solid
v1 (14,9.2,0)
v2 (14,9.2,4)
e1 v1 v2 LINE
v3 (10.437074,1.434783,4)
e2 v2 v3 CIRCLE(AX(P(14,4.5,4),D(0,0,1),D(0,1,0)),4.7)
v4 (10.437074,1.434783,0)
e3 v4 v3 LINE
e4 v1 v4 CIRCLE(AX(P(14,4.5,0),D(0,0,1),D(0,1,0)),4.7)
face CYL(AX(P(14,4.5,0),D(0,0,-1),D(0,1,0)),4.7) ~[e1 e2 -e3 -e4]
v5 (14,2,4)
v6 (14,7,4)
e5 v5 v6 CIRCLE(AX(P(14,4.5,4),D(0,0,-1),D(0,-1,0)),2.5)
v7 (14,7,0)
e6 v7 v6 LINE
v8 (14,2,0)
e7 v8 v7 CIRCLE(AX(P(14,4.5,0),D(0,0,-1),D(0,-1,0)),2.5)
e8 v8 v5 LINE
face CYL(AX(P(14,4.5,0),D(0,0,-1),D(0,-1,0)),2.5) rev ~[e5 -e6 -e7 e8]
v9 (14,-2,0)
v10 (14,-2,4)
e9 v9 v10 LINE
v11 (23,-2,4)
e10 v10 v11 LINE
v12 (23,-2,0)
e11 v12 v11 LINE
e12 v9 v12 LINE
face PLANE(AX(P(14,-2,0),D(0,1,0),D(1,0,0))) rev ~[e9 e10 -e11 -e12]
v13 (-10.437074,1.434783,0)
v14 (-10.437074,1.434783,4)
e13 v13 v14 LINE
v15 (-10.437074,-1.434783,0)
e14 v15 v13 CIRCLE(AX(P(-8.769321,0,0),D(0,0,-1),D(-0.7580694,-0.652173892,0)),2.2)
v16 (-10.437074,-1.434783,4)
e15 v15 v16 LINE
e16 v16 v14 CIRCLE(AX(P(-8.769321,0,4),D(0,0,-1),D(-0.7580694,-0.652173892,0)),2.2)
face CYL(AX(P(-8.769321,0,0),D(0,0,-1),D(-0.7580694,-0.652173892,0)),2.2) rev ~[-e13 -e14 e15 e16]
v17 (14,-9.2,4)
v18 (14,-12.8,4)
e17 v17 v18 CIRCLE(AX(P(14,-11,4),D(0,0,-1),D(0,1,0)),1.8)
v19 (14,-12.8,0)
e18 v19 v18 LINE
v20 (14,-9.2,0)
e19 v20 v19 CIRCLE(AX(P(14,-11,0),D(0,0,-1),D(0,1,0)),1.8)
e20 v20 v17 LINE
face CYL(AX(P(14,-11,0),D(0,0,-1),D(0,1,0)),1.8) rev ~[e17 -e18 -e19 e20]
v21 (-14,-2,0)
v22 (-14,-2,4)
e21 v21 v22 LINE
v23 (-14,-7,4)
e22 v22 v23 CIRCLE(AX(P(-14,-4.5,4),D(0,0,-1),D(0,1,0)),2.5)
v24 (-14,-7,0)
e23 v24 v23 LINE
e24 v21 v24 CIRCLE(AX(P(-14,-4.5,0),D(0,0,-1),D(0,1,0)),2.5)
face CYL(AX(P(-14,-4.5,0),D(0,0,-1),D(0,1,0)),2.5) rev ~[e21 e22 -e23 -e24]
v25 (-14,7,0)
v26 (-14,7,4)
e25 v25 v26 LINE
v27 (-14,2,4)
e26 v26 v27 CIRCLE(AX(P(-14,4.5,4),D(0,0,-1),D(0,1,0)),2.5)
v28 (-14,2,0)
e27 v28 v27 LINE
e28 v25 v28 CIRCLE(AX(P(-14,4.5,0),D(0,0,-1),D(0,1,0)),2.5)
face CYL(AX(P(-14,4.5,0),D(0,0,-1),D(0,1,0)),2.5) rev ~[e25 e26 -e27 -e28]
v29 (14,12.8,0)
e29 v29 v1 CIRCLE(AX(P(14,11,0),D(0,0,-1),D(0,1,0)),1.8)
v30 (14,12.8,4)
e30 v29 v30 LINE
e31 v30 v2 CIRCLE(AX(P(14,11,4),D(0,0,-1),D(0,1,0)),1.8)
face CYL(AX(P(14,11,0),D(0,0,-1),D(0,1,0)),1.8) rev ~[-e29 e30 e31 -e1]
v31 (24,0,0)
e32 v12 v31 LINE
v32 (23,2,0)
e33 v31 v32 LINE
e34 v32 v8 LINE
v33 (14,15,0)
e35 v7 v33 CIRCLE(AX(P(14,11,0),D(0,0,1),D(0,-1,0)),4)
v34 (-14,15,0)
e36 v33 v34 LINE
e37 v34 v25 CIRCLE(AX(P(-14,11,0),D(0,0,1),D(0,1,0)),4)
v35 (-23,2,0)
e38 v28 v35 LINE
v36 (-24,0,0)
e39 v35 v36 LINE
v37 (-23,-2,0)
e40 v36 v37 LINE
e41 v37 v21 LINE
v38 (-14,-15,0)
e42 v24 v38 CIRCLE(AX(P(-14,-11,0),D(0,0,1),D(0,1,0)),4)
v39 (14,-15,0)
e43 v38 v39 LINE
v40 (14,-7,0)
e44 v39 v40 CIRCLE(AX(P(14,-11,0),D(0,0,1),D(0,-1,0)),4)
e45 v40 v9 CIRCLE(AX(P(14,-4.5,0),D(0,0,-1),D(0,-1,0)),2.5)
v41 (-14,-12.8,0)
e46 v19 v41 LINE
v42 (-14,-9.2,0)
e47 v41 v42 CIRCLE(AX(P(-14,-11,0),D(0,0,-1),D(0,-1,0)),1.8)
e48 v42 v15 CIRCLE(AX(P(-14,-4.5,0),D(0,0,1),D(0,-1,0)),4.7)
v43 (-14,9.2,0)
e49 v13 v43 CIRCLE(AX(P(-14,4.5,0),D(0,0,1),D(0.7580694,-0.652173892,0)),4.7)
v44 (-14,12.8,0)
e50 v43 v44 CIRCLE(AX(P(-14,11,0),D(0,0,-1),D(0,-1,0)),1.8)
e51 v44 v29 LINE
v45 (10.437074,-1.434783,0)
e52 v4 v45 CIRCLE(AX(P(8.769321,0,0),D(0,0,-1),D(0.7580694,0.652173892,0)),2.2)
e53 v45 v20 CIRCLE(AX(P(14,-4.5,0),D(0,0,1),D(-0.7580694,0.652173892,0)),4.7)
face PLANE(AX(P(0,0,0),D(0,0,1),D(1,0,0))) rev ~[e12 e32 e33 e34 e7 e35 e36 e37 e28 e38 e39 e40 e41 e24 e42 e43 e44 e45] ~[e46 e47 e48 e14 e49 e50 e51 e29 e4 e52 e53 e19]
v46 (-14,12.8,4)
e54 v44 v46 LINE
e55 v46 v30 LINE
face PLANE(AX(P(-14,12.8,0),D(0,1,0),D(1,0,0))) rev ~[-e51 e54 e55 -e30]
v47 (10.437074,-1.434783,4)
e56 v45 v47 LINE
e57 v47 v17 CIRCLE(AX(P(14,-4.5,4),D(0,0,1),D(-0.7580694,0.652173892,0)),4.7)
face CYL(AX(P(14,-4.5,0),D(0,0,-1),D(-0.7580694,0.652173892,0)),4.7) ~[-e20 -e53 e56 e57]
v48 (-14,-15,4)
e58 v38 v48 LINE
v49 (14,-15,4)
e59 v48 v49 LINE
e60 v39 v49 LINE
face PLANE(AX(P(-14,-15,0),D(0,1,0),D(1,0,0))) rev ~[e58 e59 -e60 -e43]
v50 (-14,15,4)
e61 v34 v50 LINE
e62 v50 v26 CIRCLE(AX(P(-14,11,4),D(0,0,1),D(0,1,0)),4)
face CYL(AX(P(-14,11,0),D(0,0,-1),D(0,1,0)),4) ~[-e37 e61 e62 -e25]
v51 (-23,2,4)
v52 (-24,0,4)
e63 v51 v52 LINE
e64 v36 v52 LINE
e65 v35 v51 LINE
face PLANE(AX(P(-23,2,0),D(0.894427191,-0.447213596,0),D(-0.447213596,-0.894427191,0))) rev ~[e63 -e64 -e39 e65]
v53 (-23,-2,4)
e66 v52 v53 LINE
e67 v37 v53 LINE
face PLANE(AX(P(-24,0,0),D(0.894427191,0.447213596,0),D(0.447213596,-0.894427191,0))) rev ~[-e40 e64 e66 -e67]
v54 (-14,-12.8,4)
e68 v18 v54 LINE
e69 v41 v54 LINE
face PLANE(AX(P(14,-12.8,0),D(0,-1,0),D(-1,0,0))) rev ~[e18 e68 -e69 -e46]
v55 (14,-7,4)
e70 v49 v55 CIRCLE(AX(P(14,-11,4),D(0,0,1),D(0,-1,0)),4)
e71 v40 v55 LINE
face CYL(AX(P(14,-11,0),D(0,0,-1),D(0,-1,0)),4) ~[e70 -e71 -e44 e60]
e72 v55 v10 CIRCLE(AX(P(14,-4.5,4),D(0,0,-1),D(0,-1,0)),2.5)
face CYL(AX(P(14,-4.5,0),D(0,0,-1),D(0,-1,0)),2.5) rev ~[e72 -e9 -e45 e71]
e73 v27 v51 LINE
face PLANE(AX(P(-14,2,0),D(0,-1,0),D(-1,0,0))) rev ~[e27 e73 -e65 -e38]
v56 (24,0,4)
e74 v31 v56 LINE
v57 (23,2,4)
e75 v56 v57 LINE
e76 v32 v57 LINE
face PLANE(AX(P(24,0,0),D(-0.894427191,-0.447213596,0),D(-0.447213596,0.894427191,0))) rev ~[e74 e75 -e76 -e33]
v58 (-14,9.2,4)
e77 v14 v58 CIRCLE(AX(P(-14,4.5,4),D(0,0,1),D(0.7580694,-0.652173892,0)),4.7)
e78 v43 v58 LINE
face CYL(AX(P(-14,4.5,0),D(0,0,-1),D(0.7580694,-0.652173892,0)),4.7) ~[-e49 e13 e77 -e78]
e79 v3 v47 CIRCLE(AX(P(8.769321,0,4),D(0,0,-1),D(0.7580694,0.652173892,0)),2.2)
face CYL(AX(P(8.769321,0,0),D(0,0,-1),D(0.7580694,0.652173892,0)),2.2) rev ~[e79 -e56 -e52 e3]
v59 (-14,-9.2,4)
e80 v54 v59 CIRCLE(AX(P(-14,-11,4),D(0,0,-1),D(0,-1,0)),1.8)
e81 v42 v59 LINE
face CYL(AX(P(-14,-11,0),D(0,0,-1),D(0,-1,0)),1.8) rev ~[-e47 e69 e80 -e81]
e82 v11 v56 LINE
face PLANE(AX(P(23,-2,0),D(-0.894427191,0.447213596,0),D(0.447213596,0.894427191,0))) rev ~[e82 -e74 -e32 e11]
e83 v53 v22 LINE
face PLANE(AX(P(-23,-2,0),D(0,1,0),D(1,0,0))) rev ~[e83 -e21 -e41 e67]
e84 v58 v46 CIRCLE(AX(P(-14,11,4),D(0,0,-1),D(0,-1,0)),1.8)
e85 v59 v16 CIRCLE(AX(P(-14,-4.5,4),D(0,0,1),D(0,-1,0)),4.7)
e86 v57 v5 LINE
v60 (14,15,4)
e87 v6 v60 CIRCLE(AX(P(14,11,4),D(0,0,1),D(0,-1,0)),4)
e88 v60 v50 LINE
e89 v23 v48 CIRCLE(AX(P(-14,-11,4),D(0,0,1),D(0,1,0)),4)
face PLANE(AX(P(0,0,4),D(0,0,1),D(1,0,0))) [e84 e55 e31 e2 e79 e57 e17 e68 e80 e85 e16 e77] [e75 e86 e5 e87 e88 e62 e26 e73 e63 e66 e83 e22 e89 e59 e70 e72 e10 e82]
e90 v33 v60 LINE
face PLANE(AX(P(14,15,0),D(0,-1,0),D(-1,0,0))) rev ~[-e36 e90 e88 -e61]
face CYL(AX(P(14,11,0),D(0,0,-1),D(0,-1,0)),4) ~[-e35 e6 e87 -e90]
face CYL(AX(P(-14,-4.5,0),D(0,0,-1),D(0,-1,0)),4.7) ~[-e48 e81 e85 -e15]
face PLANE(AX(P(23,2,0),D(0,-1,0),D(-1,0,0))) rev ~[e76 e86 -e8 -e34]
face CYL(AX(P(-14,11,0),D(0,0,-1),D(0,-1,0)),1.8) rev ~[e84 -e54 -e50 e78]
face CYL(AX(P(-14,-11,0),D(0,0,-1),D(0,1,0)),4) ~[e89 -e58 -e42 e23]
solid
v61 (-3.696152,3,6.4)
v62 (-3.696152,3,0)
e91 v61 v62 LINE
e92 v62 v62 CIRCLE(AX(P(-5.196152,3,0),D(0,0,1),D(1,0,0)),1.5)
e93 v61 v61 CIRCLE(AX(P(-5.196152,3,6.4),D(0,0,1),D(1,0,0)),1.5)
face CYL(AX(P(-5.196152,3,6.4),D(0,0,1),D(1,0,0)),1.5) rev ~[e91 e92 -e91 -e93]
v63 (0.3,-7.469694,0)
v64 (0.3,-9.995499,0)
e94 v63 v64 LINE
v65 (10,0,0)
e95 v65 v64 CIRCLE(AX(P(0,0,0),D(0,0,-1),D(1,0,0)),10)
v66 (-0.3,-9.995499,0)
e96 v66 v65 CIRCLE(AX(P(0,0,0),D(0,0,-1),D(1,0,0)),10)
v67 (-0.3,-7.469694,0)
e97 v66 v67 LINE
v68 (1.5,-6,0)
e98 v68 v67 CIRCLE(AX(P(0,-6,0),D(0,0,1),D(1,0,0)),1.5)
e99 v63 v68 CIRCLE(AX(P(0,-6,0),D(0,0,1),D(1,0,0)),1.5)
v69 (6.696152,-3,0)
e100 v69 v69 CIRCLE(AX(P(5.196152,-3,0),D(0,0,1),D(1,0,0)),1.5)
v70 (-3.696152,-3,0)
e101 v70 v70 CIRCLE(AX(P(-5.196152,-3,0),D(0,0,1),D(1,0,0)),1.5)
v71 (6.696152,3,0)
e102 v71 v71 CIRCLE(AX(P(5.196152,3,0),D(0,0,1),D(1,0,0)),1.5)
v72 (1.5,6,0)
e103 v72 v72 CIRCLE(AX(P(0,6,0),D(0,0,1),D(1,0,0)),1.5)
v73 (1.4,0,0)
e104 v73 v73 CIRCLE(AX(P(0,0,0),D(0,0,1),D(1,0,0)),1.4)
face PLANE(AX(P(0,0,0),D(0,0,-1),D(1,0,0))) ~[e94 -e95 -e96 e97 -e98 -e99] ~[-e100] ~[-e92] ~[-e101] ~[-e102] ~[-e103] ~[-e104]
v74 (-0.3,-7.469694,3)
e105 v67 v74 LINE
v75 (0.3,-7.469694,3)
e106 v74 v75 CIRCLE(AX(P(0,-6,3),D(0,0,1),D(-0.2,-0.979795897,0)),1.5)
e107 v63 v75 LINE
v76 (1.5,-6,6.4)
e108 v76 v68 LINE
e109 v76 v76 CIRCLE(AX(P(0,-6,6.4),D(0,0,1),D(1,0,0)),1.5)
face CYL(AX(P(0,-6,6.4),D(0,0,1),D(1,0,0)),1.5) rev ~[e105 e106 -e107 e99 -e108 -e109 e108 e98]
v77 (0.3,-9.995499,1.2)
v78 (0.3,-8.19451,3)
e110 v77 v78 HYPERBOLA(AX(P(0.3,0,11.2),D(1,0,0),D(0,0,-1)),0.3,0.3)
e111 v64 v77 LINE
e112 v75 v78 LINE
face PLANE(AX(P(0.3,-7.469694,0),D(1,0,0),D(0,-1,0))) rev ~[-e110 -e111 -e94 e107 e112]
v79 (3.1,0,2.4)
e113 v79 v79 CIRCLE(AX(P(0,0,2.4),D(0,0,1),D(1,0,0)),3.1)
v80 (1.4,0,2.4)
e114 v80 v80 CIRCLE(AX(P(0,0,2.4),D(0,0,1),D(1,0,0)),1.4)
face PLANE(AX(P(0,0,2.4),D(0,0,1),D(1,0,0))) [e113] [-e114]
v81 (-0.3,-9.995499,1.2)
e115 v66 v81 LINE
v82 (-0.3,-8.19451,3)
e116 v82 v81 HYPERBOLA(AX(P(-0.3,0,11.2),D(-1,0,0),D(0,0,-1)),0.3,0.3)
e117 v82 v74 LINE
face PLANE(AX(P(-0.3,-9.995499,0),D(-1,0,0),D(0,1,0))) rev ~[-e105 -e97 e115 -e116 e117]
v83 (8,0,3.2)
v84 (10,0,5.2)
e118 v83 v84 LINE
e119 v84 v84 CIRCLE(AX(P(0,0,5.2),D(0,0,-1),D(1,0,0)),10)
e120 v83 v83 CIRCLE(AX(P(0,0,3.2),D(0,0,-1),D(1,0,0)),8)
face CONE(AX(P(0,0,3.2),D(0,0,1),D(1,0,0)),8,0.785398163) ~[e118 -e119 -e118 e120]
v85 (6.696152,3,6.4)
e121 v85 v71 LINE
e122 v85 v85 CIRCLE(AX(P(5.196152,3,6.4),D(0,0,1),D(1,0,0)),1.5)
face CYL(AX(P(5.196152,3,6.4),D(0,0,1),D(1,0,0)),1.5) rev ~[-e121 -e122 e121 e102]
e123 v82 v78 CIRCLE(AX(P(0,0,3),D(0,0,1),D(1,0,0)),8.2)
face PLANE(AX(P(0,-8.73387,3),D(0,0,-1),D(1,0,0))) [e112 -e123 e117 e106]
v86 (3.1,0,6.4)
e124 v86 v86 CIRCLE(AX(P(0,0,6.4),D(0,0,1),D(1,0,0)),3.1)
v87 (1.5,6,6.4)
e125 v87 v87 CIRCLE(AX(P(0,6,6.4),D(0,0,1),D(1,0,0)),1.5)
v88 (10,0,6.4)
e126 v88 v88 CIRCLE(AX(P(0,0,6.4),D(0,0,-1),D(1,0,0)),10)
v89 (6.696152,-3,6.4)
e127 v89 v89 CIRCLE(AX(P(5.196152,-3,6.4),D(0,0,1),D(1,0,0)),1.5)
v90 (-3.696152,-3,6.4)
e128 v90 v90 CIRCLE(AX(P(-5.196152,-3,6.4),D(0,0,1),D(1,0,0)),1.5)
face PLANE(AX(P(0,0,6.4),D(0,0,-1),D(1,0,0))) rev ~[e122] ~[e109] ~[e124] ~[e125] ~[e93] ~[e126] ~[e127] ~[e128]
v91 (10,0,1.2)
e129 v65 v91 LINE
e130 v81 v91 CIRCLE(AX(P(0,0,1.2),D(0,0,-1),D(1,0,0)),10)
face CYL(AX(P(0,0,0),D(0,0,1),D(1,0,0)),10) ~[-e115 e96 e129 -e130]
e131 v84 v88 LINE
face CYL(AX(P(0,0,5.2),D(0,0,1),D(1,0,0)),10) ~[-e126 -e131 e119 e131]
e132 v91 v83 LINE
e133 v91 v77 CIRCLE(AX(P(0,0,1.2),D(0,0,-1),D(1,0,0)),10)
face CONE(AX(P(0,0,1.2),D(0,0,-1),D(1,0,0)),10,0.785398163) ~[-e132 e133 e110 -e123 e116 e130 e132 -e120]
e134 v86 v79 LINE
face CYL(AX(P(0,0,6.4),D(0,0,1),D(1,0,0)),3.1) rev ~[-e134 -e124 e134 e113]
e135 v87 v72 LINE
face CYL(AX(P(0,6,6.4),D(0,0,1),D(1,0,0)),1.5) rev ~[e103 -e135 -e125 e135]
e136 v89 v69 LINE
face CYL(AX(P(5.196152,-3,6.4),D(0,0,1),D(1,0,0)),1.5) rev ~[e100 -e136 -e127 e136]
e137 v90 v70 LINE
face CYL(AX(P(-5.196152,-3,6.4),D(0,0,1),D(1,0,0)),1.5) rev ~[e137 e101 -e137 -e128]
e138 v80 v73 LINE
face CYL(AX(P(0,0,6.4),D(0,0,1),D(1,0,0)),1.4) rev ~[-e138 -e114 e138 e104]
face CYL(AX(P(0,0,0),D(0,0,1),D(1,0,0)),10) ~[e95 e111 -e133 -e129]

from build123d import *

# Parameters (mm, degrees)
F1_DEPTH = 4
F4_R     = 1.5
F4_R_2   = 1.4
F5_DEPTH = 6.401
F4_R_3   = 3.1
F6_DEPTH = 4
F8_DEPTH = 3


# Not quite as in the source:
# - a feature names something its author has since deleted; it is built from what else it names


with BuildPart() as f1:
    # F0 (on Top) → F1 (new body)
    with BuildSketch(Plane.XY):
        with BuildLine():
            Line((-23, 2), (-24, 0))
            Line((-24, 0), (-23, -2))
            Line((-23, -2), (-14, -2))
            ThreePointArc((-14, -2), (-11.5, -4.5), (-14, -7))
            ThreePointArc((-14, -7), (-18, -11), (-14, -15))
            Line((-14, -15), (0, -15))
            Line((0, -15), (14, -15))
            ThreePointArc((14, -15), (18, -11), (14, -7))
            ThreePointArc((14, -7), (11.5, -4.5), (14, -2))
            Line((14, -2), (23, -2))
            Line((23, -2), (24, 0))
            Line((24, 0), (23, 2))
            Line((23, 2), (14, 2))
            ThreePointArc((14, 2), (11.5, 4.5), (14, 7))
            ThreePointArc((14, 7), (18, 11), (14, 15))
            Line((14, 15), (0, 15))
            Line((0, 15), (-14, 15))
            ThreePointArc((-14, 15), (-18, 11), (-14, 7))
            ThreePointArc((-14, 7), (-11.5, 4.5), (-14, 2))
            Line((-14, 2), (-23, 2))
        make_face()
        with BuildLine():
            ThreePointArc((-14, -9.2000002265), (-9.7282015038, -6.4600356469), (-10.4370736488, -1.4347825616))
            ThreePointArc((-10.4370736488, -1.4347825616), (-10.969320969, 0), (-10.4370736488, 1.4347825616))
            ThreePointArc((-10.4370736488, 1.4347825616), (-9.7282015038, 6.4600356469), (-14, 9.2000002265))
            ThreePointArc((-14, 9.2000002265), (-15.7999997735, 11), (-14, 12.7999997735))
            Line((-14, 12.7999997735), (0.5136036673, 12.7999997735))
            Line((0.5136036673, 12.7999997735), (14, 12.7999997735))
            ThreePointArc((14, 12.7999997735), (15.7999997735, 11), (14, 9.2000002265))
            ThreePointArc((14, 9.2000002265), (9.7282015038, 6.4600356469), (10.4370736488, 1.4347825616))
            ThreePointArc((10.4370736488, 1.4347825616), (10.969320969, 0), (10.4370736488, -1.4347825616))
            ThreePointArc((10.4370736488, -1.4347825616), (9.7282015038, -6.4600356469), (14, -9.2000002265))
            ThreePointArc((14, -9.2000002265), (15.7999997735, -11), (14, -12.7999997735))
            Line((14, -12.7999997735), (0, -12.7999997735))
            Line((0, -12.7999997735), (-14, -12.7999997735))
            ThreePointArc((-14, -12.7999997735), (-15.7999997735, -11), (-14, -9.2000002265))
        make_face(mode=Mode.SUBTRACT)
    extrude(amount=F1_DEPTH)


with BuildPart() as f3:
    # F2 (on Front) → F3 (revolve)
    with BuildSketch(Plane.XZ):
        Polygon((0, 6.4), (0, 0), (10, 0), (10, 1.2), (8, 3.2), (10, 5.2), (10, 6.4), align=None)
    revolve(axis=Axis((0, 0, 3.2), (0, 0, -1)))

    # F4 (on face) → F5 (cut, through all)
    with BuildSketch(Plane.XY.offset(6.4)):
        with Locations((5.1961524227, 3)):
            Circle(F4_R)
        with Locations((5.1961524227, -3)):
            Circle(F4_R)
        with Locations((0, -6)):
            Circle(F4_R)
        with Locations((-5.1961524227, -3)):
            Circle(F4_R)
        with Locations((-5.1961524227, 3)):
            Circle(F4_R)
        Circle(F4_R_2)
        with Locations((0, 6)):
            Circle(F4_R)
    extrude(amount=-F5_DEPTH, mode=Mode.SUBTRACT)

    # F4 (on face) → F6 (cut)
    with BuildSketch(Plane.XY.offset(6.4)):
        Circle(F4_R_3)
        Circle(F4_R_2, mode=Mode.SUBTRACT)
    extrude(amount=-F6_DEPTH, mode=Mode.SUBTRACT)

    # F7 (on face) → F8 (cut)
    with BuildSketch(Plane(origin=(0, 0, 0), x_dir=(1, 0, 0), z_dir=(0, 0, -1))):
        with BuildLine():
            ThreePointArc((-0.3, 7.4696938457), (0, 7.5), (0.3, 7.4696938457))
            Line((0.3, 7.4696938457), (0.3, 9.995498987))
            ThreePointArc((0.3, 9.995498987), (0, 10), (-0.3, 9.995498987))
            Line((-0.3, 9.995498987), (-0.3, 7.4696938457))
        make_face()
    extrude(amount=-F8_DEPTH, mode=Mode.SUBTRACT)


solid = Compound([f1.part, f3.part])
